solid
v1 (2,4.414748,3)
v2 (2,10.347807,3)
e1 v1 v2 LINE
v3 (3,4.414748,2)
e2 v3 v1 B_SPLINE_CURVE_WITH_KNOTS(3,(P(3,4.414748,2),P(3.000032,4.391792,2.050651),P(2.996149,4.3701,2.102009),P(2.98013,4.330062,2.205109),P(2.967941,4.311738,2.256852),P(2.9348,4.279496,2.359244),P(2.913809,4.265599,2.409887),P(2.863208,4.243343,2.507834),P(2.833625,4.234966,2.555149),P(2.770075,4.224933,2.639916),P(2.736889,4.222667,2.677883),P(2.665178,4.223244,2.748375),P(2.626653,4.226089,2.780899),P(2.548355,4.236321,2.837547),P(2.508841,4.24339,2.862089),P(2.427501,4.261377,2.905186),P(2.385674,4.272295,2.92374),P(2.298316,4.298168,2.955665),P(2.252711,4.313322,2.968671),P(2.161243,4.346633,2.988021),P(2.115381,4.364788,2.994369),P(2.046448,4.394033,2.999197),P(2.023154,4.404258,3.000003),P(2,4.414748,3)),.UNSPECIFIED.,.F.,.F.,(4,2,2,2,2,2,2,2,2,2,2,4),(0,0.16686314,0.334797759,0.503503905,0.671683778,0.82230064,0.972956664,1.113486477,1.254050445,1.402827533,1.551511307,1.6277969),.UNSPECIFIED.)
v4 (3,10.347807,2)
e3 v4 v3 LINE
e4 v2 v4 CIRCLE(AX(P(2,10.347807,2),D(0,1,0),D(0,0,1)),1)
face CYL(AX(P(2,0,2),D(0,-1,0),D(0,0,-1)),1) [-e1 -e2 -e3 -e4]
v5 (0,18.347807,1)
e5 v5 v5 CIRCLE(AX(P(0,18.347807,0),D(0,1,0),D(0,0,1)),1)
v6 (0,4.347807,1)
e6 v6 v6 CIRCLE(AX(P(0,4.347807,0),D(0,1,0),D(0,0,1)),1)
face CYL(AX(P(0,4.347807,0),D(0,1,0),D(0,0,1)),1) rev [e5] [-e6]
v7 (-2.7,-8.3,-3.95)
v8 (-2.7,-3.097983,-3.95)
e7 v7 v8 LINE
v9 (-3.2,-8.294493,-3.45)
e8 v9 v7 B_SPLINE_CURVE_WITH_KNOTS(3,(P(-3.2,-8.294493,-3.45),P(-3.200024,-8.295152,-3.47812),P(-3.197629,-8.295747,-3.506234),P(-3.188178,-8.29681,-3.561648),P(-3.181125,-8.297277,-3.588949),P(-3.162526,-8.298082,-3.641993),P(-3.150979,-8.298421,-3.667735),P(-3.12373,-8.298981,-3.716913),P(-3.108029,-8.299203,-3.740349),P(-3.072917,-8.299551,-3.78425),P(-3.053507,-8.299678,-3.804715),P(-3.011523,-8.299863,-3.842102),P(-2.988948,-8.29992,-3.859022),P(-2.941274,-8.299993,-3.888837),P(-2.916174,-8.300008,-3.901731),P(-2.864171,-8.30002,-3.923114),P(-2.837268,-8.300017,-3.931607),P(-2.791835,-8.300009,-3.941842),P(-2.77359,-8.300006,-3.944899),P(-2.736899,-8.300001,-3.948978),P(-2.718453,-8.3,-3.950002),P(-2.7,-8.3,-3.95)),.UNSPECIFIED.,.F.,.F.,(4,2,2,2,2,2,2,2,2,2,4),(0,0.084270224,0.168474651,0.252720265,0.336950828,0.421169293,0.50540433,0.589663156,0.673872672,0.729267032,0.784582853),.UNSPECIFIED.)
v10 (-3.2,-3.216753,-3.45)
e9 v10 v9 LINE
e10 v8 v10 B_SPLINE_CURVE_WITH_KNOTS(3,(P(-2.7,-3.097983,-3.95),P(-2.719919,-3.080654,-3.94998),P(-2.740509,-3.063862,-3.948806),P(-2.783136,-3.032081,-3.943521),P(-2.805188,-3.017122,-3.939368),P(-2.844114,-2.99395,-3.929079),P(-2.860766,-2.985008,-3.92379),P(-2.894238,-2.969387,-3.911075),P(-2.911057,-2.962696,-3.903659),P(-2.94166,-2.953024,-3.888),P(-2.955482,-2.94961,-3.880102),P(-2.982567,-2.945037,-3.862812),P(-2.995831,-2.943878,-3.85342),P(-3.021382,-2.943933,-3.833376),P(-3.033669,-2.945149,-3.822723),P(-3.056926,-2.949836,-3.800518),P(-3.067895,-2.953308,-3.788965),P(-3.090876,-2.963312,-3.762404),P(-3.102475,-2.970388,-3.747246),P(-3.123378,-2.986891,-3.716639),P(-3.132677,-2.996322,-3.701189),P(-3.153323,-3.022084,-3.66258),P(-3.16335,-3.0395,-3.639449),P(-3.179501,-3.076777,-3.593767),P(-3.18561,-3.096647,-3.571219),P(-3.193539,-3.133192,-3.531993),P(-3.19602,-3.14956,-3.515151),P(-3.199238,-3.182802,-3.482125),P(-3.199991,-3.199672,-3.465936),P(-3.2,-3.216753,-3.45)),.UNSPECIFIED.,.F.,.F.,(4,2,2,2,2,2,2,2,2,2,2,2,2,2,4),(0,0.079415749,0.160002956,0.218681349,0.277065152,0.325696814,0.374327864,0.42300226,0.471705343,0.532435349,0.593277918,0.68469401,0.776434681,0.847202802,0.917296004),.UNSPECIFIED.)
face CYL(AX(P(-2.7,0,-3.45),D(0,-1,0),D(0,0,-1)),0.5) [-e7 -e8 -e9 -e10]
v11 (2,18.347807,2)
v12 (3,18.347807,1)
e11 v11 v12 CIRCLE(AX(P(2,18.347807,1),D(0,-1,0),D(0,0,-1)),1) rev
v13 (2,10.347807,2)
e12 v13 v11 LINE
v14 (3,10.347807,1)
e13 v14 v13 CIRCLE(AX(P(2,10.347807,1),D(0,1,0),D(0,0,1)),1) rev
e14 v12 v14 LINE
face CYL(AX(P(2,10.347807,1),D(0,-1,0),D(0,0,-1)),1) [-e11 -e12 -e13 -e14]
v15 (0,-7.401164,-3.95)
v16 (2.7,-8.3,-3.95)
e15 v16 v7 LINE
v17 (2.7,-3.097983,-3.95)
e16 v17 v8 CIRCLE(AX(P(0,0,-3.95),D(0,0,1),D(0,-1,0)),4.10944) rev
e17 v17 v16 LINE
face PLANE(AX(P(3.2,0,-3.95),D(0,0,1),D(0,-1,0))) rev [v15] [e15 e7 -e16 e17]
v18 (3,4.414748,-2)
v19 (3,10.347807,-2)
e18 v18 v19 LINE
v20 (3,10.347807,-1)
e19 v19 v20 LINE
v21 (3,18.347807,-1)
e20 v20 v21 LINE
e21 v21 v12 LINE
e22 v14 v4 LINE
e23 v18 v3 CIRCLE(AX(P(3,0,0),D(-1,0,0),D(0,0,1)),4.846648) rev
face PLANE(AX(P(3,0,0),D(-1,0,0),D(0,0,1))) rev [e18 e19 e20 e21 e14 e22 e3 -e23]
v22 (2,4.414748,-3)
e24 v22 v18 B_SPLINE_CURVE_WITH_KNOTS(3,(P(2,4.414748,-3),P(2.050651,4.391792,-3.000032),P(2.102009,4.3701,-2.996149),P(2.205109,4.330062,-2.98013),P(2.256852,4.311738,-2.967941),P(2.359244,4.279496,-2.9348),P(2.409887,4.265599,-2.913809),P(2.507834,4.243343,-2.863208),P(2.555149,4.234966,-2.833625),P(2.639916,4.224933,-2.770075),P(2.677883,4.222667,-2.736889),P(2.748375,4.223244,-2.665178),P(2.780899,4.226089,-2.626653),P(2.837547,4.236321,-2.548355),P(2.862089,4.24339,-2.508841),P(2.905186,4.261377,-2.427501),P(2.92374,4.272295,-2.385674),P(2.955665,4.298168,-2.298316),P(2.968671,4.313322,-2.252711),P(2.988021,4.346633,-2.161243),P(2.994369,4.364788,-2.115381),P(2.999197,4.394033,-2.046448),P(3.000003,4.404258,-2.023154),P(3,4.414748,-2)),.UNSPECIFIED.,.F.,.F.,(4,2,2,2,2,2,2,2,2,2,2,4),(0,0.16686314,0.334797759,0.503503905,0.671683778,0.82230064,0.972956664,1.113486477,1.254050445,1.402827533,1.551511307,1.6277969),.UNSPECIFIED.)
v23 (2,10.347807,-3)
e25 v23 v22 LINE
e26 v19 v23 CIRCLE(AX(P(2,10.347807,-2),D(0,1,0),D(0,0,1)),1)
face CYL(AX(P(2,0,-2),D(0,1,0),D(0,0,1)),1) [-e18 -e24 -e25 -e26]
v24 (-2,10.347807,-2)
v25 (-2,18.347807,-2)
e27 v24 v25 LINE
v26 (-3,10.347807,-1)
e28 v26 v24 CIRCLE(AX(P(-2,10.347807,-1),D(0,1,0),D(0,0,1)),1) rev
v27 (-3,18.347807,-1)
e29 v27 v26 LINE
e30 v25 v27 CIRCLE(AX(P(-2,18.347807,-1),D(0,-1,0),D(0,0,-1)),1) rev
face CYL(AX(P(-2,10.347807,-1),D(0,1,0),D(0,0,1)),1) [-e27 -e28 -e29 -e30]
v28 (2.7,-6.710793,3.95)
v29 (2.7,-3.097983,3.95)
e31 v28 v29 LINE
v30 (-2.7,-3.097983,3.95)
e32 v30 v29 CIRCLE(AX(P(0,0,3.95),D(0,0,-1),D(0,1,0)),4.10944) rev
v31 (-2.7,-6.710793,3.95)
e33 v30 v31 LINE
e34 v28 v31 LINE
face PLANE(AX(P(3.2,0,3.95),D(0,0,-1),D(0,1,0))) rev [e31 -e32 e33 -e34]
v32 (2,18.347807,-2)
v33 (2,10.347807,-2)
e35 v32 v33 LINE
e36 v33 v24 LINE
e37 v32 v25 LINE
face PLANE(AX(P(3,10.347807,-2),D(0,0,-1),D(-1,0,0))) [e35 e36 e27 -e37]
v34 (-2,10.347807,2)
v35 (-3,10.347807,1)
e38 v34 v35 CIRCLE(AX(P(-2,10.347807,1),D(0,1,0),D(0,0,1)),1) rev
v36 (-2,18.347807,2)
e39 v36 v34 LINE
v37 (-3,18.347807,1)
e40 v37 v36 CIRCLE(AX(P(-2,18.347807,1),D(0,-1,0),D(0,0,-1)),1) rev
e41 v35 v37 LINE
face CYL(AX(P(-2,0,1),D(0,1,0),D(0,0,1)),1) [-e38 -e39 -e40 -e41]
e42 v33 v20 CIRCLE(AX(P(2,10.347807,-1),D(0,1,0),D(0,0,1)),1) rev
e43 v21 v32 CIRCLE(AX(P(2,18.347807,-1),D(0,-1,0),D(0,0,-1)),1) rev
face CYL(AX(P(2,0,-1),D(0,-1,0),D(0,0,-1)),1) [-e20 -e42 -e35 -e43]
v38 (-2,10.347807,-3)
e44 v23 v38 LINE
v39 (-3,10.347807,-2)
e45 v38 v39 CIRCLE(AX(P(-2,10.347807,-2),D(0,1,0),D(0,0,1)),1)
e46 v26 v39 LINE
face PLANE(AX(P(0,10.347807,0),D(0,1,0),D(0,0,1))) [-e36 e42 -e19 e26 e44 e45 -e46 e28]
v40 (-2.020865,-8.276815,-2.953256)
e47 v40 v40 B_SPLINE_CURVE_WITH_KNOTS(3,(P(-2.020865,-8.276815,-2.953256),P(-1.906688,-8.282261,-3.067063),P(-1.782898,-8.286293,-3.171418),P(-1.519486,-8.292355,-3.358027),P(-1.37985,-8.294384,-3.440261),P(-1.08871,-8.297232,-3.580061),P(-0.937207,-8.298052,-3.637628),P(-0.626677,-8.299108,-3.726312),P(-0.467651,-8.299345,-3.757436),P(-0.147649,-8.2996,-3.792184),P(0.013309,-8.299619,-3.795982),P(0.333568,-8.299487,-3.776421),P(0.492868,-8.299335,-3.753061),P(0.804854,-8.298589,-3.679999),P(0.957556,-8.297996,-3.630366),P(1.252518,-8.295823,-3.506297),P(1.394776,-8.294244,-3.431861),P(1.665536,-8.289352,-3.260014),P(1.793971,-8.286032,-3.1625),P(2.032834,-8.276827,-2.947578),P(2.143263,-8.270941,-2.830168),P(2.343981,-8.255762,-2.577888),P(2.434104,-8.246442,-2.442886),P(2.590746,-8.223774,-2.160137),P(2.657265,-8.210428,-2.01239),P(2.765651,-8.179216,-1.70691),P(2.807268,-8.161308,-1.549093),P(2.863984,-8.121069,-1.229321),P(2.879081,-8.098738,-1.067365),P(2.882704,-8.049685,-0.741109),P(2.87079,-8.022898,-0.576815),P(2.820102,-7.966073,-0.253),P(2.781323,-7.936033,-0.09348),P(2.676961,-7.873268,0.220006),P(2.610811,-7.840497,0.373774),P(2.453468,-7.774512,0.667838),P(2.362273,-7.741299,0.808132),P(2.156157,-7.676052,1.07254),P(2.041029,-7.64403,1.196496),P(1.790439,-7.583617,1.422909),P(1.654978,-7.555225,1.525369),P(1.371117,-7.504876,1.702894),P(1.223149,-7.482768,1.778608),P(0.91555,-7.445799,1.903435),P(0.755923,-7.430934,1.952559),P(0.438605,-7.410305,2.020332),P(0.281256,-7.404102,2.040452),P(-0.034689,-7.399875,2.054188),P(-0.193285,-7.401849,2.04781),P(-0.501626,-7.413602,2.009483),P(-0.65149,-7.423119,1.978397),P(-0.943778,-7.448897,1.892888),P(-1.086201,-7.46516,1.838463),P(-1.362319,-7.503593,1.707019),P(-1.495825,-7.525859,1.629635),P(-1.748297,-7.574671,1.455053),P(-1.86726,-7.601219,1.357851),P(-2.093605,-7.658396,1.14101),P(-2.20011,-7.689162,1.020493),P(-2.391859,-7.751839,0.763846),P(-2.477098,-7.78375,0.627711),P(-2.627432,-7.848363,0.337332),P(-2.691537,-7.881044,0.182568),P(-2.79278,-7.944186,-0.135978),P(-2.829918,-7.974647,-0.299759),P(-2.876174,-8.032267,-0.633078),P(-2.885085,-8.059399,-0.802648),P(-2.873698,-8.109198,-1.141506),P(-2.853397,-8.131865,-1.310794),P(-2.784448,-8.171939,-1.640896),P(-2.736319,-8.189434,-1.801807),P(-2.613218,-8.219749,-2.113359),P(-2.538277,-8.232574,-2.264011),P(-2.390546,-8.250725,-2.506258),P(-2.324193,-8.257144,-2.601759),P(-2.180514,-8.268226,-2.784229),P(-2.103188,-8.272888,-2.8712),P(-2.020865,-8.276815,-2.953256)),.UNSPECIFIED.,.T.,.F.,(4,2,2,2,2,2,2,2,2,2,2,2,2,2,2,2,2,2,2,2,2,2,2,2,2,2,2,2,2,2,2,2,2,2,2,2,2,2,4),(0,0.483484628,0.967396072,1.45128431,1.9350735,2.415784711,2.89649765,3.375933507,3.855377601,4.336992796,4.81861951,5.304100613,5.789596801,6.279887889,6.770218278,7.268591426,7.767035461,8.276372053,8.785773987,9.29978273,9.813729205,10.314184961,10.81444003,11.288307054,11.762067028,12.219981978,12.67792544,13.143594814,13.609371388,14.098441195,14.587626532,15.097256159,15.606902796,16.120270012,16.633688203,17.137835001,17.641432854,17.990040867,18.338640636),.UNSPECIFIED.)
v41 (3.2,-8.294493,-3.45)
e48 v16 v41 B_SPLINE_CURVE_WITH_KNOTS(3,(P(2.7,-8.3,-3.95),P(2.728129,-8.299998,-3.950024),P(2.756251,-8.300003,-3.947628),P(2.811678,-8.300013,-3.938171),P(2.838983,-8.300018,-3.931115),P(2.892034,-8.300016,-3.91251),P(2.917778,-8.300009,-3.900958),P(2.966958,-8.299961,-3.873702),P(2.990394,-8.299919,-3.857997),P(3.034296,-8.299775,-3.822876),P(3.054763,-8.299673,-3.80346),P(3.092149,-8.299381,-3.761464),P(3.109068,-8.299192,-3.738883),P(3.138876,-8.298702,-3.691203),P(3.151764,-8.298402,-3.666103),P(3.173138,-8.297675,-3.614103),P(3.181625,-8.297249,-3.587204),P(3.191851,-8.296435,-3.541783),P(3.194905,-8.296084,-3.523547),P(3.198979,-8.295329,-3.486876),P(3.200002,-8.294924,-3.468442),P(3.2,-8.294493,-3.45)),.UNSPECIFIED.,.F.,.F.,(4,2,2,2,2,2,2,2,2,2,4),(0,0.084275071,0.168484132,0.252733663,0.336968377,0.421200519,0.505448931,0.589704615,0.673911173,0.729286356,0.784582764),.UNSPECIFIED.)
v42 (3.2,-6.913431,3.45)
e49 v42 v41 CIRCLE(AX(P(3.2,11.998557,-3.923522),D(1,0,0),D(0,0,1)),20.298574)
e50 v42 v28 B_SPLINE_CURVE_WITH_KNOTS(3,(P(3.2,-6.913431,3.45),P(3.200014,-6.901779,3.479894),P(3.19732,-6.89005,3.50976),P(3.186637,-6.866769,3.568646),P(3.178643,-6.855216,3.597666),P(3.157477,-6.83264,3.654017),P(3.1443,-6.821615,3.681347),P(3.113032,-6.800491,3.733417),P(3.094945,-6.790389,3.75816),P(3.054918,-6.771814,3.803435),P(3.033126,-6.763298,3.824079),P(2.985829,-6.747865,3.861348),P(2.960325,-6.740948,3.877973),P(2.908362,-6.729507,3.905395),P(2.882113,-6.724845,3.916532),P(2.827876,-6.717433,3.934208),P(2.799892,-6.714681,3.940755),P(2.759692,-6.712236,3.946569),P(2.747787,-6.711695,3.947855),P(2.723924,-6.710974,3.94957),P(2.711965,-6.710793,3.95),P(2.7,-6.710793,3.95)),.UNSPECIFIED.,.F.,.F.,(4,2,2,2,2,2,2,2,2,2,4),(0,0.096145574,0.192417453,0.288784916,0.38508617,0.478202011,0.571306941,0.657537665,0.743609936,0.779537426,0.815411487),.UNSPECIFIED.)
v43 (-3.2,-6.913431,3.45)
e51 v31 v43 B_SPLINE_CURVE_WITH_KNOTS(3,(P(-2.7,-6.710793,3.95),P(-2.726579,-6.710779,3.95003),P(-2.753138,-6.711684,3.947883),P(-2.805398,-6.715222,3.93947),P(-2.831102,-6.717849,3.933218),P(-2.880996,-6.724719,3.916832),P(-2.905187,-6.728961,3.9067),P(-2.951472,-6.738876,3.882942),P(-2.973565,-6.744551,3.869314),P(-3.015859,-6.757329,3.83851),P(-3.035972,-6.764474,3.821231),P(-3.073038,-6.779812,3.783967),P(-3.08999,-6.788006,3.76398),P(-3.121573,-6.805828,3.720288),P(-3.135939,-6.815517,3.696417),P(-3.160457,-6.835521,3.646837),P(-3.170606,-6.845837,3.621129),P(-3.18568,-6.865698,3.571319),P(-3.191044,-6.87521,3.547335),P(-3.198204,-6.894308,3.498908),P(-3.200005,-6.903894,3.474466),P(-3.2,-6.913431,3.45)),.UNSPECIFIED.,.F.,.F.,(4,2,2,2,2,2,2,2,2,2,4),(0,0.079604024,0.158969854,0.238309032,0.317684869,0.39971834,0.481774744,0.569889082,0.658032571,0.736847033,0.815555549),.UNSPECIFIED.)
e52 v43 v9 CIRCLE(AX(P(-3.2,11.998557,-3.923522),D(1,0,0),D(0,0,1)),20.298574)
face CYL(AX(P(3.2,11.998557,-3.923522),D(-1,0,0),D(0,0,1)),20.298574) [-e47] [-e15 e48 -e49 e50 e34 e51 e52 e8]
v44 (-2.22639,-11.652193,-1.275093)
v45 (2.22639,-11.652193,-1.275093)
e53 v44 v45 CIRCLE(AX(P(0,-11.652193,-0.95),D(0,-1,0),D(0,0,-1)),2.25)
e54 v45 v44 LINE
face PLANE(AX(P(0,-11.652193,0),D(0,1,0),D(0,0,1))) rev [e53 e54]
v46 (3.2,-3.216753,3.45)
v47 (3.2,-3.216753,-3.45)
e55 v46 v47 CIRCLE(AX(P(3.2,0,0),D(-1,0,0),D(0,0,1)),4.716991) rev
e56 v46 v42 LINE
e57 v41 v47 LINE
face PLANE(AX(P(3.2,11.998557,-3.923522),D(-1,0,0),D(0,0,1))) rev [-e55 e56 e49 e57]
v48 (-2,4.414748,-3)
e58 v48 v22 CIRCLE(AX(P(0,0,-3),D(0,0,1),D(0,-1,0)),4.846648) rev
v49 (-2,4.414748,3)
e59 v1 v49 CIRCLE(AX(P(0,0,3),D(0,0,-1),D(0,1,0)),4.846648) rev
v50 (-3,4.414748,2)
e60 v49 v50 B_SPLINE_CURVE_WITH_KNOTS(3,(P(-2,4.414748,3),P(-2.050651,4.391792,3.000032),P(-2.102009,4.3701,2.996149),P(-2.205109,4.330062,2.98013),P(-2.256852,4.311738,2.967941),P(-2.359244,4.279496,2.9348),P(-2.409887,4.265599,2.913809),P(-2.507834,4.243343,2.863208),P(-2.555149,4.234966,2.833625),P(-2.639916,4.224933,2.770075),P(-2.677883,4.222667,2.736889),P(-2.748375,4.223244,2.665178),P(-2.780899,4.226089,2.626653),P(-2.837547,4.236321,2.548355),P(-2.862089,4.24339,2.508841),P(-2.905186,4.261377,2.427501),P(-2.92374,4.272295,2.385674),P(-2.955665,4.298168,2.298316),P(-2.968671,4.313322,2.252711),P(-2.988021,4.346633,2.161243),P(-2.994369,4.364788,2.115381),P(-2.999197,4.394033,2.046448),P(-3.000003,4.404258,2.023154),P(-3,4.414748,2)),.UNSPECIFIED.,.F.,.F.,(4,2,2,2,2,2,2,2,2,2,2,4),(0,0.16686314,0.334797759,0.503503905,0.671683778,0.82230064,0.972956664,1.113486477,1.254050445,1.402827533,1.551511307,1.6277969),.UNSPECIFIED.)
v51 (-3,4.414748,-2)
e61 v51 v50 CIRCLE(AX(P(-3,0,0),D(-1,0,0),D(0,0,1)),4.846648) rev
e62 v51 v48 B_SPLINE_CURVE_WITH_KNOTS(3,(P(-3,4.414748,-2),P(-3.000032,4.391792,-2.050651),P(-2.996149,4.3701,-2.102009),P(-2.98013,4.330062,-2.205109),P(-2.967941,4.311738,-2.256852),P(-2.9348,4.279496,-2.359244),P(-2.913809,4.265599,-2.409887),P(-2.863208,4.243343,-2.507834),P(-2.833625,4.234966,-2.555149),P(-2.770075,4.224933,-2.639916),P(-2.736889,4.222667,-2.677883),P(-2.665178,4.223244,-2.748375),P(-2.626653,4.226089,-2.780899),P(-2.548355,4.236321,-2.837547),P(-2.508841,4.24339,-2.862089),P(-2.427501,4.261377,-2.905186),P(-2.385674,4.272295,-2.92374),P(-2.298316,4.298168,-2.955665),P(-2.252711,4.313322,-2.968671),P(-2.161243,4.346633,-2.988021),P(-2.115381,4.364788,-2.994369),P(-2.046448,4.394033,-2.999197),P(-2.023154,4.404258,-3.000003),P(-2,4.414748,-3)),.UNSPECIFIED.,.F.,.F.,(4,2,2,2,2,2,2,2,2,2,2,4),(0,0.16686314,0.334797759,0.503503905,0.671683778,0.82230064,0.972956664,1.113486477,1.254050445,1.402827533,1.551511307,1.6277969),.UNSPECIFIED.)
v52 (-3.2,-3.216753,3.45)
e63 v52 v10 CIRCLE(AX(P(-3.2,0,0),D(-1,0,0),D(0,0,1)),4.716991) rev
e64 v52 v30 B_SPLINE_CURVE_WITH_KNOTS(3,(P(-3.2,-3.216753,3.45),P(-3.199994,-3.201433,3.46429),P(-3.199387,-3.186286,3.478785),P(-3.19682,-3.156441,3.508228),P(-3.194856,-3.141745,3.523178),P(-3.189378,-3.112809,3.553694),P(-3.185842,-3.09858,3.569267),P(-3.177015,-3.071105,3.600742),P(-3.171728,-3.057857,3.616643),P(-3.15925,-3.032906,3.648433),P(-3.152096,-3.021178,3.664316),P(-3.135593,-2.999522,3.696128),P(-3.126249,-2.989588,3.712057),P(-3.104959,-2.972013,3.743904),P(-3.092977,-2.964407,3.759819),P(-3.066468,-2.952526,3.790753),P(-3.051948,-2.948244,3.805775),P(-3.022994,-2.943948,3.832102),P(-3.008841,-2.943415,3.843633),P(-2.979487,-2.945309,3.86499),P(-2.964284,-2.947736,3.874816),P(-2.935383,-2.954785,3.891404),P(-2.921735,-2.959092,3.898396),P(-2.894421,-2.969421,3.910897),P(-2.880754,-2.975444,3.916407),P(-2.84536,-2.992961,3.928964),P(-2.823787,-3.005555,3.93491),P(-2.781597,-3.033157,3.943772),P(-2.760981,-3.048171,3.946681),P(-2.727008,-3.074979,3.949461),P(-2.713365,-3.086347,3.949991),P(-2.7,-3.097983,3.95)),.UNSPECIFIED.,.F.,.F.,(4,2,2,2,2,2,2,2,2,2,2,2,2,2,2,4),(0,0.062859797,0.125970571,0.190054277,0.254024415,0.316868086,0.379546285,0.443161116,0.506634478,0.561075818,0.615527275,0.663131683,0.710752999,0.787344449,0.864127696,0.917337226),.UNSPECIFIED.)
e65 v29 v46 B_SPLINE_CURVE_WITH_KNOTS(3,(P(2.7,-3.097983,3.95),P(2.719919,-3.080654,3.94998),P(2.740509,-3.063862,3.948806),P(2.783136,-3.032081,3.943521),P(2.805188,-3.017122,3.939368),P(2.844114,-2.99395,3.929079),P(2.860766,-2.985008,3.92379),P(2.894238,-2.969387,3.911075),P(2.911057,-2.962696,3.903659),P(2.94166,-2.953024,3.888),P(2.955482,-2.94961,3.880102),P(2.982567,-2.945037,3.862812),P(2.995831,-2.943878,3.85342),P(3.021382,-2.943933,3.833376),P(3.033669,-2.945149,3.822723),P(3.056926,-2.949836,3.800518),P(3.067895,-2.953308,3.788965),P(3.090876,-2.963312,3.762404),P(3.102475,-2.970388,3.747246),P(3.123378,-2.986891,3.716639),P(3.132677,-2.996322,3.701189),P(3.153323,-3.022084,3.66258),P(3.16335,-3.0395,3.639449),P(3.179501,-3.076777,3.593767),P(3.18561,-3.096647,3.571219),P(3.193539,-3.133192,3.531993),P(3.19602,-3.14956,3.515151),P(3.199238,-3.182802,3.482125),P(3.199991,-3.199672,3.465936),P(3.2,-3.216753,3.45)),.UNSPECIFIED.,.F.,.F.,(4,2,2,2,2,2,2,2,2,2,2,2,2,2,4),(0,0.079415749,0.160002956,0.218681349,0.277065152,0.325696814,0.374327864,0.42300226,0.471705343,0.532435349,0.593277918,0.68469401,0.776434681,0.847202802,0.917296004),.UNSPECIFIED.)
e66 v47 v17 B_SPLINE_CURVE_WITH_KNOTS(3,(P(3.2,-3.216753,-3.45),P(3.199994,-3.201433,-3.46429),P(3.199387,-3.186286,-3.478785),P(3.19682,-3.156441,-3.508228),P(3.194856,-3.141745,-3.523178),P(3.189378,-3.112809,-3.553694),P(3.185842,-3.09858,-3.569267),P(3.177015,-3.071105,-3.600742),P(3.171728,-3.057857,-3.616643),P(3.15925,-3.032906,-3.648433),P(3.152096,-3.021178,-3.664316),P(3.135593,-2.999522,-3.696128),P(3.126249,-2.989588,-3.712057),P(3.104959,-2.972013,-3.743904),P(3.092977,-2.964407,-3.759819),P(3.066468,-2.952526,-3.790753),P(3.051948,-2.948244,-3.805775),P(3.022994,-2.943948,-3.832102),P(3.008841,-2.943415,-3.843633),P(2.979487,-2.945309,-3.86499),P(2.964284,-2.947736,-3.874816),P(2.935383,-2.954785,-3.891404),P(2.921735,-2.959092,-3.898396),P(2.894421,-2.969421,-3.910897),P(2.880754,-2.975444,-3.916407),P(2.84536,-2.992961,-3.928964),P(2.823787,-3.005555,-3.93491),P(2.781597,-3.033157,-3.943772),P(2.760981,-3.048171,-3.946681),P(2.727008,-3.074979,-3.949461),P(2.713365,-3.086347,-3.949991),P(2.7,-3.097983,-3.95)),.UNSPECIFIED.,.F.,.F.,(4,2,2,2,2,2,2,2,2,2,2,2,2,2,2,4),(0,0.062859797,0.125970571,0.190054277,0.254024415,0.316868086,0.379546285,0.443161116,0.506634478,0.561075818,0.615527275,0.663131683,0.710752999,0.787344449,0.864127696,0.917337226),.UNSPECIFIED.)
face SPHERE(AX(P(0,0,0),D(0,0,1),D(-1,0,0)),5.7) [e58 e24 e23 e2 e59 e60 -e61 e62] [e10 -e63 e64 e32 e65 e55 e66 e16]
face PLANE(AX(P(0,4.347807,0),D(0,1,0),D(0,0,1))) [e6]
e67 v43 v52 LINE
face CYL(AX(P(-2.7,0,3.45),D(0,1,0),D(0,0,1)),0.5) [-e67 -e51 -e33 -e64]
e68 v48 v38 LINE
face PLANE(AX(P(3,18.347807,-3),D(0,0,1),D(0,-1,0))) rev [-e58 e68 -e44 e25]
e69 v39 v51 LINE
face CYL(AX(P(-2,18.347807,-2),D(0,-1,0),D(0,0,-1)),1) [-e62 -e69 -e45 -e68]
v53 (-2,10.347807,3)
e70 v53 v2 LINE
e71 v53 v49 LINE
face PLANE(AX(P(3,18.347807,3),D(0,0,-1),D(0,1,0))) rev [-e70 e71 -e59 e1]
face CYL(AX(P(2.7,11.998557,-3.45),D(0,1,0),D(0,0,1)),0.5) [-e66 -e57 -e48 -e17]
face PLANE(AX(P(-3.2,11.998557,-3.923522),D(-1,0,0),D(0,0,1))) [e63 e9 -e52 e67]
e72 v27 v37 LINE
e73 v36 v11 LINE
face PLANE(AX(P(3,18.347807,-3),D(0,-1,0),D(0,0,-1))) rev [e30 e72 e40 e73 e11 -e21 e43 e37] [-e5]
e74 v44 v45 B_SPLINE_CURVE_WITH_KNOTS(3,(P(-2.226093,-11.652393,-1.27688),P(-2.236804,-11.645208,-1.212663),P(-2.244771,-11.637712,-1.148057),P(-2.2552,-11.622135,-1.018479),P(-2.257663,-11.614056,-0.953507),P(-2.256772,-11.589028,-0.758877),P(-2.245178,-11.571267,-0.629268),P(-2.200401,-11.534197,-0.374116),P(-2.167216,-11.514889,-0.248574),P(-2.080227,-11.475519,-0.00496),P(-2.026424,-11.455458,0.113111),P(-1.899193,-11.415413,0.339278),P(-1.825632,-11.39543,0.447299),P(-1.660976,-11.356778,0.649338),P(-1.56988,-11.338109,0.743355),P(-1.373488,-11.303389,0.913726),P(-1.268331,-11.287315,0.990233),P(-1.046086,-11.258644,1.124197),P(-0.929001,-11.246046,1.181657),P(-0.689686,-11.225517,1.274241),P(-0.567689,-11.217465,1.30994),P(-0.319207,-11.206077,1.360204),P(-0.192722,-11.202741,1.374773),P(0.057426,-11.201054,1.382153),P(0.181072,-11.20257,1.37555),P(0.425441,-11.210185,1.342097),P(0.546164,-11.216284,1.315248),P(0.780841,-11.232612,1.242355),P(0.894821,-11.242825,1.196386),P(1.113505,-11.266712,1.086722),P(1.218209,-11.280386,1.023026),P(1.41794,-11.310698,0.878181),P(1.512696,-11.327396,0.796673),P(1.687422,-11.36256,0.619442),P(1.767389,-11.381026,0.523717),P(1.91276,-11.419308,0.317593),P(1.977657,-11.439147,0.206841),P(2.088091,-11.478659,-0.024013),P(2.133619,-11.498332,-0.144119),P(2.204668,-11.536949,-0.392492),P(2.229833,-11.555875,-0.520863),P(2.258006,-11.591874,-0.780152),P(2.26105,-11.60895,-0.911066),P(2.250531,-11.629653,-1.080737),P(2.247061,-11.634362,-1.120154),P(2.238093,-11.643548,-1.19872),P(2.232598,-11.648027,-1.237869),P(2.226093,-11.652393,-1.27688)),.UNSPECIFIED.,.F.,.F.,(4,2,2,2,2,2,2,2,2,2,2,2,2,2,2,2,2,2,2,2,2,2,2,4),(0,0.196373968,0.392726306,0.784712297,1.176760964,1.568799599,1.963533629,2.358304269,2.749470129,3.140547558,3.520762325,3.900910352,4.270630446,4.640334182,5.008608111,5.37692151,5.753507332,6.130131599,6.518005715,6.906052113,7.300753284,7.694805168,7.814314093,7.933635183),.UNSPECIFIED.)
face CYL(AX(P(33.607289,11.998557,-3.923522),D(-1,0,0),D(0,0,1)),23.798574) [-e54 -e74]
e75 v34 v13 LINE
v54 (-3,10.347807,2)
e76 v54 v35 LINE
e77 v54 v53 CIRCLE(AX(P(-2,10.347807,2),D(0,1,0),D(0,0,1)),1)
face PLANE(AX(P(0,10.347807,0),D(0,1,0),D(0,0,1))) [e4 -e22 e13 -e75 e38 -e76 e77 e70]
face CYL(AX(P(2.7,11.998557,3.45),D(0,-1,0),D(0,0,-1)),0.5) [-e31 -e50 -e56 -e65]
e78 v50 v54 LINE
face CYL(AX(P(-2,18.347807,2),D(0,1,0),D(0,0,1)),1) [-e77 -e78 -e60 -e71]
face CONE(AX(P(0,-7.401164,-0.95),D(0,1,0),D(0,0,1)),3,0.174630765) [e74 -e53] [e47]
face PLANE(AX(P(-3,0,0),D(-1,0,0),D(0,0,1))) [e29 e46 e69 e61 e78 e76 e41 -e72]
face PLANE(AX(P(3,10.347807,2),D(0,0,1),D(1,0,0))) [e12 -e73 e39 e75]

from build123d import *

# Parameters (mm, degrees)
BOSS_EXTRUDE1_DEPTH = 3.2
CUT_EXTRUDE1_START  = -2.25739
CUT_EXTRUDE1_DEPTH  = 4.51476888
SKETCH6_W           = 6
SKETCH6_H           = 16.9095993
BOSS_EXTRUDE2_DEPTH = 3
SKETCH7_OUTSIDE_W   = 20.212
SKETCH7_OUTSIDE_H   = 20.212
SKETCH7_OUTSIDE_W_2 = 6
SKETCH7_OUTSIDE_H_2 = 4
CUT_EXTRUDE2_DEPTH  = 8
FILLET1_R           = 1
FILLET2_R           = 0.5
SKETCH8_R           = 1
CUT_EXTRUDE3_DEPTH  = 14


# Read off the part's stored shape, not the designer's step: Cut-Extrude1
with BuildPart() as part:
    # Sketch1 → Revolve1 (revolve)
    with BuildSketch(Plane(origin=(0, 0, 0), x_dir=(1, 0, 0), z_dir=(0, 1, 0))):
        with BuildLine():
            Line((0, 5.7), (0, -5.7))
            ThreePointArc((0, -5.7), (5.7, 0), (0, 5.7))
        make_face()
    revolve(axis=Axis((0, 0, 14.54011976), (0, 0, -1)))

    # Sketch2 → Boss-Extrude1 (add, symmetric)
    with BuildSketch(Plane(origin=(0, 0, 0), x_dir=(0, 0, -1), z_dir=(1, 0, 0))):
        with BuildLine():
            Line((-3.95, 0), (3.95, 0))
            Line((3.95, 0), (3.95, -8.3))
            ThreePointArc((3.95, -8.3), (-0.079654203, -7.901360118), (-3.95, -6.710792959))
            Line((-3.95, -6.710792959), (-3.95, 0))
        make_face()
    extrude(amount=BOSS_EXTRUDE1_DEPTH, both=True)

    # Sketch3 → Revolve2 (revolve)
    with BuildSketch(Plane(origin=(0, 0, 0), x_dir=(0, 0, -1), z_dir=(1, 0, 0)), mode=Mode.PRIVATE) as revolve2_sk:
        Polygon((0.95, -7.401163559), (0.95, -11.652192734), (3.2, -11.652192734), (3.95, -7.401163559), align=None)
    revolve(revolve2_sk.sketch.rotate(Axis((0, -11.652192734, -0.95), (0, 1, 0)), 45.250719205), axis=Axis((0, -11.652192734, -0.95), (0, 1, 0)))

    # Cut-Extrude1 outline → Cut-Extrude1 (cut)
    with BuildSketch(Plane(origin=(0, 0, 0), x_dir=(0, 0, -1), z_dir=(1, 0, 0)).offset(CUT_EXTRUDE1_START)):
        with BuildLine():
            Line((-3, -11.652192734), (1.275092895, -11.652192734))
            ThreePointArc((1.275092895, -11.652192734), (-0.058768815, -11.464467118), (-1.379872872, -11.201575434))
            Line((-1.379872872, -11.201575434), (-3, -10.831225258))
            Line((-3, -10.831225258), (-3, -11.652192734))
        make_face()
    extrude(amount=CUT_EXTRUDE1_DEPTH, mode=Mode.SUBTRACT)

    # Sketch6 → Boss-Extrude2 (add, symmetric)
    with BuildSketch(Plane(origin=(0, 0, 0), x_dir=(0, 0, -1), z_dir=(1, 0, 0))):
        with Locations((0, 9.893007616)):
            Rectangle(SKETCH6_W, SKETCH6_H)
    extrude(amount=BOSS_EXTRUDE2_DEPTH, both=True)

    # Sketch7 outside → Cut-Extrude2 (cut)
    with BuildSketch(Plane(origin=(0, 18.347807266, 0), x_dir=(1, 0, 0), z_dir=(0, 1, 0))):
        Rectangle(SKETCH7_OUTSIDE_W, SKETCH7_OUTSIDE_H)
        Rectangle(SKETCH7_OUTSIDE_W_2, SKETCH7_OUTSIDE_H_2, mode=Mode.SUBTRACT)
    extrude(amount=-CUT_EXTRUDE2_DEPTH, mode=Mode.SUBTRACT)

    # Fillet1
    fillet1_edges = [part.edges().sort_by_distance(p)[0] for p in [
        (-3, 7.077190264, 3),
        (3, 7.077190264, 3),
        (-3, 7.077190264, -3),
        (3, 7.077190264, -3),
        (-3, 14.347807266, -2),
        (-3, 14.347807266, 2),
        (3, 14.347807266, -2),
        (3, 14.347807266, 2),
    ]]
    fillet(fillet1_edges, radius=FILLET1_R)

    # Fillet2
    fillet2_edges = [part.edges().sort_by_distance(p)[0] for p in [
        (-3.2, -4.644533788, 3.95),
        (3.2, -4.644533788, 3.95),
        (3.2, -5.439137308, -3.95),
        (-3.2, -5.439137308, -3.95),
    ]]
    fillet(fillet2_edges, radius=FILLET2_R)

    # Sketch8 → Cut-Extrude3 (cut)
    with BuildSketch(Plane(origin=(0, 18.347807266, 0), x_dir=(1, 0, 0), z_dir=(0, 1, 0))):
        with Locations(Location((0, 0, 0), (0, 0, 270))):
            Circle(SKETCH8_R)
    extrude(amount=-CUT_EXTRUDE3_DEPTH, mode=Mode.SUBTRACT)


solid = part.part
